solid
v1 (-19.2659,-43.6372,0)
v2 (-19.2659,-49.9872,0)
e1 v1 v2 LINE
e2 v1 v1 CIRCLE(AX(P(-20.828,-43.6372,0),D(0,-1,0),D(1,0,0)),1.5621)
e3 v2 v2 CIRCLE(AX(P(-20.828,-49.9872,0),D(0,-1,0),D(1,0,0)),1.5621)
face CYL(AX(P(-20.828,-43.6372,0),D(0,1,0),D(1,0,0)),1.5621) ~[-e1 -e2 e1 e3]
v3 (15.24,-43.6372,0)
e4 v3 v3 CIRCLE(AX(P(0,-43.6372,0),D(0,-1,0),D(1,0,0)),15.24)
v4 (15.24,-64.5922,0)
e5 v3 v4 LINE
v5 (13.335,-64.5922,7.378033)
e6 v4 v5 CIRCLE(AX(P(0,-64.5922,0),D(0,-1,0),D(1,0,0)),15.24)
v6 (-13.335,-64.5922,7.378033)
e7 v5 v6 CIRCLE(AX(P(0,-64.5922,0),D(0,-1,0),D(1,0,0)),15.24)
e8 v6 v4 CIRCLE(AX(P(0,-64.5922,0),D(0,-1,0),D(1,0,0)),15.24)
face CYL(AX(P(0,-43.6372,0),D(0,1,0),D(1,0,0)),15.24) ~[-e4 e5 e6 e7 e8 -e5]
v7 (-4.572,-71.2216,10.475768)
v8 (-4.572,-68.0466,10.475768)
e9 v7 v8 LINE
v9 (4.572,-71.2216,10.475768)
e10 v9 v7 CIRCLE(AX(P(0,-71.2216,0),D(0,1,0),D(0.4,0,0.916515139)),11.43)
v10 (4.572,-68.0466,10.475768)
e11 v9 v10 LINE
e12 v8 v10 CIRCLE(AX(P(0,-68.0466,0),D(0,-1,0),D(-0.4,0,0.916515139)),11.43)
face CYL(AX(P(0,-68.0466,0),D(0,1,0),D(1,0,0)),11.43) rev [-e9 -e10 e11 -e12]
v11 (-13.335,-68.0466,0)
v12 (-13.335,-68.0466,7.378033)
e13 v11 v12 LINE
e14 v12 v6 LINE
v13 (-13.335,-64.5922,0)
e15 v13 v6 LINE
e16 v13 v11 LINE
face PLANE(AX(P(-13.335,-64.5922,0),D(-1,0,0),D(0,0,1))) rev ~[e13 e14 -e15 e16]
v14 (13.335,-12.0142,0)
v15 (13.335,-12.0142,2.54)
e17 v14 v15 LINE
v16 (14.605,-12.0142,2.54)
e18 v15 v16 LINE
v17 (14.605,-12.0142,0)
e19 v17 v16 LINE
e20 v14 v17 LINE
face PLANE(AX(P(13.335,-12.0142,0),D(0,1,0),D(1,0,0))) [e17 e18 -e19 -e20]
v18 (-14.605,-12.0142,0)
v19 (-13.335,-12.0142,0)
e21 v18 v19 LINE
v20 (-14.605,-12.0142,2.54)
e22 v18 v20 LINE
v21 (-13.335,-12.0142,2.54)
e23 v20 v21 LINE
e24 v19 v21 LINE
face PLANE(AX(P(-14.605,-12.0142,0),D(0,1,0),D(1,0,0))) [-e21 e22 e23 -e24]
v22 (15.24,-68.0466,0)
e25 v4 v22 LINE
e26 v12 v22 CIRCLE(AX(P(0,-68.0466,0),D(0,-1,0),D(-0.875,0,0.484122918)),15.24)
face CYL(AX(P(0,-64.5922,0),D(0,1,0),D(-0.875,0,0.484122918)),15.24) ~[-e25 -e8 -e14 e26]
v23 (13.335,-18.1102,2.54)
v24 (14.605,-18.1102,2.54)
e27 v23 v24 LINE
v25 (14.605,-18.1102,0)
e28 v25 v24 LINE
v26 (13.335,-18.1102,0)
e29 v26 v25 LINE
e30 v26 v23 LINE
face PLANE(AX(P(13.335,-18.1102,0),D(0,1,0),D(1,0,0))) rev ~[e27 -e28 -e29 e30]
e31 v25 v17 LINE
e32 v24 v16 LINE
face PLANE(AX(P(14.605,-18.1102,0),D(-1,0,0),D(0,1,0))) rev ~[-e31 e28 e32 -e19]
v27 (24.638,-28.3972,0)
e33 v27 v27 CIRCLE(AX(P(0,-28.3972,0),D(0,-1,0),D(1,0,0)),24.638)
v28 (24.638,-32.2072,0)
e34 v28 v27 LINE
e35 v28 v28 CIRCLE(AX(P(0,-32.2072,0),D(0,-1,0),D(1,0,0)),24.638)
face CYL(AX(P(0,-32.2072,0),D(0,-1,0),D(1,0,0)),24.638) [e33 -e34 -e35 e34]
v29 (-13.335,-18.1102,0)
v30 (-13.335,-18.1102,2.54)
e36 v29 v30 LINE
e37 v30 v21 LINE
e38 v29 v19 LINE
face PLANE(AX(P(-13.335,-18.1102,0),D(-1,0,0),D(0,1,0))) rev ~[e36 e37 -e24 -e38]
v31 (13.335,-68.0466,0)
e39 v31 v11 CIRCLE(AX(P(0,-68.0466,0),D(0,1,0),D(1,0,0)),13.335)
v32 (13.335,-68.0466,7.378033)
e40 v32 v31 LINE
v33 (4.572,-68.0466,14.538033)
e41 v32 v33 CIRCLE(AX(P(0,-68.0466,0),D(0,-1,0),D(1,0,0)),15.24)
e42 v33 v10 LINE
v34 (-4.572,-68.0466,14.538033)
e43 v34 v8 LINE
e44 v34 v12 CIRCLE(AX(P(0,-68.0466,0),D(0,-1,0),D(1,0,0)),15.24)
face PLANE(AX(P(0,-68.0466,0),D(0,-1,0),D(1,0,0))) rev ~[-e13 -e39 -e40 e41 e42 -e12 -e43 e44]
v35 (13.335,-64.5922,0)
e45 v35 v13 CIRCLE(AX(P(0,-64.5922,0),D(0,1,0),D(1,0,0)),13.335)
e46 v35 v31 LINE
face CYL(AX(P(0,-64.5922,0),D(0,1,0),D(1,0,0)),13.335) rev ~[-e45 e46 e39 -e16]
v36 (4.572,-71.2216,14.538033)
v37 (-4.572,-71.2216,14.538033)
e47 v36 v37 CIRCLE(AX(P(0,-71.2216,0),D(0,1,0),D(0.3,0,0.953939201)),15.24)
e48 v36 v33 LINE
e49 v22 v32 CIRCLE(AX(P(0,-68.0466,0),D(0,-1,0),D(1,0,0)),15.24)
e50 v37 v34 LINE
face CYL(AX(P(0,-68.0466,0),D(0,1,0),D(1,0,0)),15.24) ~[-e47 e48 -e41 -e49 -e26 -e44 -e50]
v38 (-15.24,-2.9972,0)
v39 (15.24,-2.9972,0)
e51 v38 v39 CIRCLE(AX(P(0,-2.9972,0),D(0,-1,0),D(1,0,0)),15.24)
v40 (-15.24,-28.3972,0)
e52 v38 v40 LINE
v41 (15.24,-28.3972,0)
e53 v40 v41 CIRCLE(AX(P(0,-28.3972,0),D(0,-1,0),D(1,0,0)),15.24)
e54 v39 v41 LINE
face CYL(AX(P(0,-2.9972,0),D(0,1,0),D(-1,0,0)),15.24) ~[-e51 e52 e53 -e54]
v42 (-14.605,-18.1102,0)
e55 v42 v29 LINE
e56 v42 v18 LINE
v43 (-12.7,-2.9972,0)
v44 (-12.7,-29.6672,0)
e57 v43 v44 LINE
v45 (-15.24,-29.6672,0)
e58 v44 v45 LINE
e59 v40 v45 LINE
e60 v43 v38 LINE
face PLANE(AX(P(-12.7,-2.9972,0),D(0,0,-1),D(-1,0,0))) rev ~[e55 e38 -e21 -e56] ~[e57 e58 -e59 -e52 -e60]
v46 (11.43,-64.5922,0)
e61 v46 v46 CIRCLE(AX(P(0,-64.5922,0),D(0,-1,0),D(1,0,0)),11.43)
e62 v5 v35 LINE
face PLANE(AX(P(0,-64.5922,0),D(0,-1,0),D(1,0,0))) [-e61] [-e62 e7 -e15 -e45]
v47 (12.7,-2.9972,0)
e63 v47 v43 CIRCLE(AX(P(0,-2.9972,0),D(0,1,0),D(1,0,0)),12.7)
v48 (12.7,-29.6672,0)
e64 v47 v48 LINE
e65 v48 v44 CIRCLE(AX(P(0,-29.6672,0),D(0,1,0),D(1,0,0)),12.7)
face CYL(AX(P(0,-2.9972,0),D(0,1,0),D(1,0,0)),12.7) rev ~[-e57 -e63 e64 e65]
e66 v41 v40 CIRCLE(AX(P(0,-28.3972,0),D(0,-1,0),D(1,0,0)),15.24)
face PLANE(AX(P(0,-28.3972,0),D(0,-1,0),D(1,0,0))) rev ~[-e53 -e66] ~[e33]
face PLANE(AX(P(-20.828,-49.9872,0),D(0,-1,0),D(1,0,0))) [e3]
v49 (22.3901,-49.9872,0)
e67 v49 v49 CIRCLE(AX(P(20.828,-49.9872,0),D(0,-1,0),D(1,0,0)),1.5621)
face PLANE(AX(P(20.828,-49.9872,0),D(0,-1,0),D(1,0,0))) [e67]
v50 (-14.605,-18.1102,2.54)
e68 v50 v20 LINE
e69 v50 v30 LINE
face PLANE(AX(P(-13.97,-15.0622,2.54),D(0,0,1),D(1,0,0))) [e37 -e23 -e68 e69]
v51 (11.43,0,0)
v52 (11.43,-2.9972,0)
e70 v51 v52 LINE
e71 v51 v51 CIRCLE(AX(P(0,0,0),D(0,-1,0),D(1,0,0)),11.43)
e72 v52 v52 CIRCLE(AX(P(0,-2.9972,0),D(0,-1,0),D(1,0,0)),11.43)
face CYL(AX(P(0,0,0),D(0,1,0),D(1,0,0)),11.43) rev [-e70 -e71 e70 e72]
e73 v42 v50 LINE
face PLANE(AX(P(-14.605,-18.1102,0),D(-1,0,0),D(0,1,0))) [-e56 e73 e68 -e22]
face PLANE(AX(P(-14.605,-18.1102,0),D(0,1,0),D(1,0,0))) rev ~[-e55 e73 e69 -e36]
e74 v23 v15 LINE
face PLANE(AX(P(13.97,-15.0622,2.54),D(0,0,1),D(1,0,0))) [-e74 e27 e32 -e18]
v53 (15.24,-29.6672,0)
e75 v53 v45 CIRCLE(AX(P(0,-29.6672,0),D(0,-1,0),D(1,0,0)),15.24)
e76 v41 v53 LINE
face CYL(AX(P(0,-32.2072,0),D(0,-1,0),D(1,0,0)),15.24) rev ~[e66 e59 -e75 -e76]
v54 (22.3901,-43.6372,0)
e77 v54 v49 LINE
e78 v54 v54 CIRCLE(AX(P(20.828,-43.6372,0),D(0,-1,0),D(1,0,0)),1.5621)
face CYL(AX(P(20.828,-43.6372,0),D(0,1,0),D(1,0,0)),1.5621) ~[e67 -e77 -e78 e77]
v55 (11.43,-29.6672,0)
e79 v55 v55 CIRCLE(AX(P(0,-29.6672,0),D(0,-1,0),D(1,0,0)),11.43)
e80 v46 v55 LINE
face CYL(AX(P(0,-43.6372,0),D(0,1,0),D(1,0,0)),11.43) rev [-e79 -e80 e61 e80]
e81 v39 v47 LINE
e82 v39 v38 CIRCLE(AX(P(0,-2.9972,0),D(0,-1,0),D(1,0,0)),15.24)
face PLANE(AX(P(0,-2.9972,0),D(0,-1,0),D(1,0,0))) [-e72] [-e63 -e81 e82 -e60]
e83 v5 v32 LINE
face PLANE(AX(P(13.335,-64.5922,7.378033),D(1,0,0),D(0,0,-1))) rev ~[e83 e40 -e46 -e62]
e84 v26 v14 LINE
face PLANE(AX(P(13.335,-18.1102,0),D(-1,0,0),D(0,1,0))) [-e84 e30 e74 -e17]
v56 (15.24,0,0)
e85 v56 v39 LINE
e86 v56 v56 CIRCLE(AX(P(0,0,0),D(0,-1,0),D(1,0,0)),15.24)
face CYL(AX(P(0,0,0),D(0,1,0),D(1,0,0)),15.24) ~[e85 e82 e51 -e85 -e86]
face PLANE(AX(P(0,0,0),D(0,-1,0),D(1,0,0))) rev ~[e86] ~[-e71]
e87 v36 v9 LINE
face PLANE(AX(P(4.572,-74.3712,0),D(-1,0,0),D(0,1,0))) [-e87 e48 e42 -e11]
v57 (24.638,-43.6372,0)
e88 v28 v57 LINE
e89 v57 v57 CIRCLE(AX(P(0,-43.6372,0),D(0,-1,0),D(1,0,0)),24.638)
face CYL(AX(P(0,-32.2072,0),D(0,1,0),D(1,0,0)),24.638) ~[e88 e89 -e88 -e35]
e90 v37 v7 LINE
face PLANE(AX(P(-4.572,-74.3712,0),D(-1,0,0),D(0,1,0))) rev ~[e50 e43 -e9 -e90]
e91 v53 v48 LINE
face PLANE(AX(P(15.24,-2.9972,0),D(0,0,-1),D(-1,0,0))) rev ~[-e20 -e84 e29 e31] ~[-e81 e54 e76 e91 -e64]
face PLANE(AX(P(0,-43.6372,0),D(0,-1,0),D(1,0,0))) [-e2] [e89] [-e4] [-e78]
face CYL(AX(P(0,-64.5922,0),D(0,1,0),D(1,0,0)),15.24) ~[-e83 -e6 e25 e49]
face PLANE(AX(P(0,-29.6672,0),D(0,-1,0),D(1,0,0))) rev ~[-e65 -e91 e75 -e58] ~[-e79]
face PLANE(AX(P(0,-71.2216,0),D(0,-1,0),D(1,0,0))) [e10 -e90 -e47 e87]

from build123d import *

# Parameters (mm, degrees)
F0_R      = 15.24
F0_R_2    = 11.43
F1_DEPTH  = 2.9972
F3_DEPTH  = 26.67
F4_R      = 15.24
F4_R_2    = 11.43
F5_DEPTH  = 2.54
F6_W      = 9.144
F6_H      = 6.35
F7_DEPTH  = 28.575
F8_W      = 1.27
F8_H      = 6.096
F9_DEPTH  = 2.54
F10_R     = 24.638
F10_R_2   = 15.24
F11_DEPTH = 3.81
F12_DEPTH = 11.43
F13_R     = 15.24
F13_R_2   = 11.43
F14_DEPTH = 20.955
F16_DEPTH = 3.4544
F17_R     = 15.24
F17_R_2   = 11.43
F18_DEPTH = 3.175
F19_DEPTH = 25.4
F20_R     = 1.5621
F21_DEPTH = 6.35


with BuildPart() as f1:
    # F0 (on Front) → F1 (new body)
    with BuildSketch(Plane.XZ):
        Circle(F0_R)
        Circle(F0_R_2, mode=Mode.SUBTRACT)
    extrude(amount=F1_DEPTH)

    # F2 (on face) → F3 (join)
    with BuildSketch(Plane.XZ.offset(2.9972)):
        with BuildLine():
            Line((15.24, 0), (12.7, 0))
            ThreePointArc((12.7, 0), (0, -12.7), (-12.7, 0))
            Line((-12.7, 0), (-15.24, 0))
            ThreePointArc((-15.24, 0), (0, -15.24), (15.24, 0))
        make_face()
    extrude(amount=F3_DEPTH)

    # F4 (on face) → F5 (join)
    with BuildSketch(Plane.XZ.offset(29.6672)):
        Circle(F4_R)
        Circle(F4_R_2, mode=Mode.SUBTRACT)
    extrude(amount=F5_DEPTH)

    # F6 (on Top) → F7 (cut)
    with BuildSketch(Plane.XY):
        Polygon((-13.335, -64.7192), (-13.335, -68.0212), (-4.572, -68.0212), (4.572, -68.0212), (13.335, -68.0212), (13.335, -64.7192), align=None)
        with Locations((0, -71.1962)):
            Rectangle(F6_W, F6_H)
    extrude(amount=F7_DEPTH, mode=Mode.SUBTRACT)

    # F8 (on face) → F9 (join)
    with BuildSketch(Plane.XY):
        with Locations((13.97, -15.0622)):
            Rectangle(F8_W, F8_H)
        with Locations((-13.97, -15.0622)):
            Rectangle(F8_W, F8_H)
    extrude(amount=F9_DEPTH)

    # F10 (on face) → F11 (join)
    with BuildSketch(Plane.XZ.offset(32.2072)):
        Circle(F10_R)
        Circle(F10_R_2, mode=Mode.SUBTRACT)
    extrude(amount=-F11_DEPTH)

    # F12 (add): a face of the model
    f12_faces = [f1.faces().sort_by_distance(p)[0] for p in [
        (-23.941132125, -32.2072, 0),
    ]]
    extrude(f12_faces, amount=F12_DEPTH)

    # F13 (on face) → F14 (join)
    with BuildSketch(Plane.XZ.offset(43.6372)):
        Circle(F13_R)
        Circle(F13_R_2, mode=Mode.SUBTRACT)
    extrude(amount=F14_DEPTH)

    # F15 (on face) → F16 (join)
    with BuildSketch(Plane.XZ.offset(64.5922)):
        with BuildLine():
            Line((13.335, 7.3780332745), (13.335, 0))
            ThreePointArc((13.335, 0), (0, -13.335), (-13.335, 0))
            Line((-13.335, 0), (-13.335, 7.3780332745))
            ThreePointArc((-13.335, 7.3780332745), (-3.81, -14.7560665491), (15.24, 0))
            ThreePointArc((15.24, 0), (14.7560665491, 3.81), (13.335, 7.3780332745))
        make_face()
    extrude(amount=F16_DEPTH)

    # F17 (on face) → F18 (join)
    with BuildSketch(Plane.XZ.offset(68.0466)):
        Circle(F17_R)
        Circle(F17_R_2, mode=Mode.SUBTRACT)
    extrude(amount=F18_DEPTH)

    # F6 (on Top) → F19 (cut)
    with BuildSketch(Plane.XY):
        Polygon((-13.335, -64.7192), (-13.335, -68.0212), (-4.572, -68.0212), (4.572, -68.0212), (13.335, -68.0212), (13.335, -64.7192), align=None)
        with Locations((0, -71.1962)):
            Rectangle(F6_W, F6_H)
    extrude(amount=F19_DEPTH, mode=Mode.SUBTRACT)

    # F20 (on face) → F21 (join)
    with BuildSketch(Plane.XZ.offset(43.6372)):
        with Locations((20.828, 0)):
            Circle(F20_R)
        with Locations((-20.828, 0)):
            Circle(F20_R)
    extrude(amount=F21_DEPTH)


solid = f1.part
